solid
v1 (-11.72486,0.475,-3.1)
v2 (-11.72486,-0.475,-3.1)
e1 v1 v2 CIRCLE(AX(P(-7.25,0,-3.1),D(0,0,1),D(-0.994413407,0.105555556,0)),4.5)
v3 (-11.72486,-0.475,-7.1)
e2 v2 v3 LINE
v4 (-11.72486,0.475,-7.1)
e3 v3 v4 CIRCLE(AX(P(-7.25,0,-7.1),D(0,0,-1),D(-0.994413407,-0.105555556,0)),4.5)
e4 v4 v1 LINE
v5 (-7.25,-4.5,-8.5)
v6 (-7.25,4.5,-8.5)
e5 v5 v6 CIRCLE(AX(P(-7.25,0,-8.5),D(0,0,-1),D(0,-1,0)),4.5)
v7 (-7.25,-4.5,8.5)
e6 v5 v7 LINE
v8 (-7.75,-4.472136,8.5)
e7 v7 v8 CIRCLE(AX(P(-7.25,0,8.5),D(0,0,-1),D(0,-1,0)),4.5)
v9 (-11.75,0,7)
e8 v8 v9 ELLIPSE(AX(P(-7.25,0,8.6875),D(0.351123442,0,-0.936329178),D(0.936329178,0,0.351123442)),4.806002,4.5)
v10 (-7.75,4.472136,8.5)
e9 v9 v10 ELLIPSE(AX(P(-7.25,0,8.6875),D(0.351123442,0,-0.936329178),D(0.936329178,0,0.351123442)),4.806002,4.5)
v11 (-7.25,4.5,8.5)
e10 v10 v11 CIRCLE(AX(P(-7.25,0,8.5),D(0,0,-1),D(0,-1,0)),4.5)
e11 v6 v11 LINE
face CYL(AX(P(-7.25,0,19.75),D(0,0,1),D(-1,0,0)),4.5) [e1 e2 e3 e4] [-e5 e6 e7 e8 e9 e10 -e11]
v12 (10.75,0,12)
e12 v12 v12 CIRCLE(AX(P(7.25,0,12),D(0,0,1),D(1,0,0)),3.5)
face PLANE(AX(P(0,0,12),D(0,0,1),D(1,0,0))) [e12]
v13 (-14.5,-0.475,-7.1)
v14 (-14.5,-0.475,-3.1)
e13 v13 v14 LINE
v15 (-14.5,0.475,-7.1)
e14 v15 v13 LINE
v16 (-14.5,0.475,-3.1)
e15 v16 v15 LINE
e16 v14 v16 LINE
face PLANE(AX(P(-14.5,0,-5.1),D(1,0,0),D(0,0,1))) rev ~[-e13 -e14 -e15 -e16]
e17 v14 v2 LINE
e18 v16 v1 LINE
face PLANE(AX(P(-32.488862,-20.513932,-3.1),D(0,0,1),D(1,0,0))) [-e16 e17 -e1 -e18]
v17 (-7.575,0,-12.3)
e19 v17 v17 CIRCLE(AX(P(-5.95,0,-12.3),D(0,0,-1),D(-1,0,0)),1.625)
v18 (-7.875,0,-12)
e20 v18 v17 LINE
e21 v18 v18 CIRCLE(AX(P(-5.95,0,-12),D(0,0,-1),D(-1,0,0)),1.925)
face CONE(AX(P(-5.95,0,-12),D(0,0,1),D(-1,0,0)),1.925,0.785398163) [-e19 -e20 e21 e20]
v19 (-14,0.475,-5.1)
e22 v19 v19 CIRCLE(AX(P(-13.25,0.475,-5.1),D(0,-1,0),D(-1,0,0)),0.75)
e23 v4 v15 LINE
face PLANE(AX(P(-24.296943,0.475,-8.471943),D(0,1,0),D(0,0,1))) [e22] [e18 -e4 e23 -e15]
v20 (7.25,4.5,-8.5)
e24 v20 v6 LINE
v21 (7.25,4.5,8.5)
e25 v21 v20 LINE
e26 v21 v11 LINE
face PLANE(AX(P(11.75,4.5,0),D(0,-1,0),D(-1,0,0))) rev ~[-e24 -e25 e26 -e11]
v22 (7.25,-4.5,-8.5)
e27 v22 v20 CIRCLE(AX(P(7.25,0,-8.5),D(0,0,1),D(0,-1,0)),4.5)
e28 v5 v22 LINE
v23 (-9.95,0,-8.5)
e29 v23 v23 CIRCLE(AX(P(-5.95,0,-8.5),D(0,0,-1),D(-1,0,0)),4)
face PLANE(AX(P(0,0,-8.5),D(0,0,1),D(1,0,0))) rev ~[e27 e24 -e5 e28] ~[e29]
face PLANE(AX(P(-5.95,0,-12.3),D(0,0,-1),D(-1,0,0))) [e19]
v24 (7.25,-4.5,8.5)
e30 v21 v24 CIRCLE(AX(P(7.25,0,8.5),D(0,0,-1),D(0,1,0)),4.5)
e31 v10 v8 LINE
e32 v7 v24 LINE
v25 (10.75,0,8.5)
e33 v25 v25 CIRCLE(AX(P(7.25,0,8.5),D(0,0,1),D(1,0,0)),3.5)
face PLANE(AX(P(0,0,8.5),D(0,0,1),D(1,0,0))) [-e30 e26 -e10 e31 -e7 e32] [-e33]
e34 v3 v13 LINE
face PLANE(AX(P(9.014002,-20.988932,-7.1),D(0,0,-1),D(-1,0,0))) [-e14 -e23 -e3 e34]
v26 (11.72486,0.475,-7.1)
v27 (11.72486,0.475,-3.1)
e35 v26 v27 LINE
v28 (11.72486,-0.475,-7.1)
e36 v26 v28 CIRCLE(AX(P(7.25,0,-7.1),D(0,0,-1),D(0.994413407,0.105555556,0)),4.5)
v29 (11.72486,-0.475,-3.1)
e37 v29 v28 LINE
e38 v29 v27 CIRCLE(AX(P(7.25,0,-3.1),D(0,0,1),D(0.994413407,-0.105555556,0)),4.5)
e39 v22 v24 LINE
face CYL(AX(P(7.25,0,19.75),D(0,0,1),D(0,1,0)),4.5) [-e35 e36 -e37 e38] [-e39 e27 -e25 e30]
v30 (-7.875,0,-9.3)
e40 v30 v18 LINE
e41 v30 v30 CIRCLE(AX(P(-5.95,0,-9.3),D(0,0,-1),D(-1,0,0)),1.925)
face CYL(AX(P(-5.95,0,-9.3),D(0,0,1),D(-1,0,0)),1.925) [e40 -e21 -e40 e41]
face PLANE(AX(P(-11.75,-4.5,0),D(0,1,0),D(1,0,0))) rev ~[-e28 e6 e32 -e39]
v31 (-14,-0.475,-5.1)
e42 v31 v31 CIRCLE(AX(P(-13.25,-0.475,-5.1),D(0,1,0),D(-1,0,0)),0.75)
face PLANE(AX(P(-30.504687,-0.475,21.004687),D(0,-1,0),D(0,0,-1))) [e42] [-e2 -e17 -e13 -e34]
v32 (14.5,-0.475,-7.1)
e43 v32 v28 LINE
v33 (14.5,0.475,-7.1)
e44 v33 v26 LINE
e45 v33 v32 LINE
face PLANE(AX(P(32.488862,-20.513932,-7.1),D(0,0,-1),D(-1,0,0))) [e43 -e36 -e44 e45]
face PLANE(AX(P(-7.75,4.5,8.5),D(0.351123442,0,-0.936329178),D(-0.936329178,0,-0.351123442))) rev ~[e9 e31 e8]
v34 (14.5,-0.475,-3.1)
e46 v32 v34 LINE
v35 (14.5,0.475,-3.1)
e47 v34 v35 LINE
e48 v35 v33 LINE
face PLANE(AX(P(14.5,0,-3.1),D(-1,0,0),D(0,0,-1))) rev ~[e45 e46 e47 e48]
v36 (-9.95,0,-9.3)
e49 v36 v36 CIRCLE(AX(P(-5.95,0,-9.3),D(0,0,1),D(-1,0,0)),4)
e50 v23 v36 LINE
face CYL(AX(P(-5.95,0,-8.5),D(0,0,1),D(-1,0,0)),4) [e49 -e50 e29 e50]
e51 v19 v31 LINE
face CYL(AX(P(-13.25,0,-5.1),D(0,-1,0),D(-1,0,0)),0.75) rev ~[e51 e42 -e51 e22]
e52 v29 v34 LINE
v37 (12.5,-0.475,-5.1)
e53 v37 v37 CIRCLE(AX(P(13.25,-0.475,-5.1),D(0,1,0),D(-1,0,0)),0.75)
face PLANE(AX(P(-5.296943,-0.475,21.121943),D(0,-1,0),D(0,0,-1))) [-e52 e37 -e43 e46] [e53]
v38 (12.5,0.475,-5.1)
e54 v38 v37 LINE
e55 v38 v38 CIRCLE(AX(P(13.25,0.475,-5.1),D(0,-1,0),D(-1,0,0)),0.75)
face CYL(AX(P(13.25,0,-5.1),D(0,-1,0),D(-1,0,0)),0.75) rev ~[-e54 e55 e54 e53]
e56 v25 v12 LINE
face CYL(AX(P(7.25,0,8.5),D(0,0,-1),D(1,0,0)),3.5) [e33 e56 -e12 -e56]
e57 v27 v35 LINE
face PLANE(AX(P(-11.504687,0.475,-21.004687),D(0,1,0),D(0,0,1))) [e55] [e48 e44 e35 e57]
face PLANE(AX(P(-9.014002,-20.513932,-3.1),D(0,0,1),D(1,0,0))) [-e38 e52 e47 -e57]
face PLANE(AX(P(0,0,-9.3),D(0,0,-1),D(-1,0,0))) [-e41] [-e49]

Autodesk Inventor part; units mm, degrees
ref_plane "YZ Plane" through (0, 0, 0) normal (1, 0, 0) x (0, 1, 0)
ref_plane "XZ Plane" through (0, 0, 0) normal (0, 1, 0) x (-1, 0, 0)
ref_plane "XY Plane" through (0, 0, 0) normal (0, 0, 1) x (1, 0, 0)
sketch "Эскиз1" plane through (0, 0, 0) normal (0, 0, 1) x (1, 0, 0)
  line L0 (-11.75, -4.5) -> (11.75, -4.5)
  line L1 (11.75, -4.5) -> (11.75, 4.5)
  line L2 (11.75, 4.5) -> (-11.75, 4.5)
  line L3 (-11.75, 4.5) -> (-11.75, -4.5)
  line L4 (-11.75, -4.5) -> (11.75, 4.5) construction
  line L5 (11.75, -4.5) -> (-11.75, 4.5) construction
  point P0 (0, 0)
  dimension "d0" = 23.5
  dimension "d1" = 9
extrude "Выдавливание1" add sketch "Эскиз1" along normal mid plane 17
sketch "Эскиз2" plane through (0, 0, 0) normal (0, 1, 0) x (-1, 0, 0)
  line L0 (14.5, -3.1) -> (-14.5, -3.1)
  line L1 (-14.5, -3.1) -> (-14.5, -7.1)
  line L2 (-14.5, -7.1) -> (14.5, -7.1)
  line L3 (14.5, -7.1) -> (14.5, -3.1)
  line L4 (-11.75, 8.5) -> (11.75, 8.5) projected
  line L5 (0, 8.5) -> (0, -8.5)
  line L6 (11.75, -8.5) -> (-11.75, -8.5) projected
  line L7 (14.5, -5.1) -> (-14.5, -5.1)
  line L8 (13.25, -5.1) -> (-13.25, -5.1)
  circle A0 centre (13.25, -5.1) radius 0.75
  circle A1 centre (-13.25, -5.1) radius 0.75
  point P0 (0, 0)
  point P1 (0, -7.1)
  point P2 (0, -5.1)
  dimension "d4" = 29
  dimension "d5" = 4
  dimension "d6" = 26.5
  dimension "d7" = 1.5
  dimension "d8" = 1.5
  dimension "d9" = 3.4
extrude "Выдавливание2" add sketch "Эскиз2" along normal mid plane 0.95 contours L3 L7 A0 L5 L0 | L5 L7 A1 L1 L0 | L3 L2 L5 L7 A0 | L5 L2 L1 L7 A1
fillet "Сопряжение1" radius 4.5 4 edges at (-11.75, -4.5, 0) (-11.75, 4.5, 0) (11.75, 4.5, 0) (11.75, -4.5, 0)
sketch "Эскиз3" plane through (0, 0, 8.5) normal (0, 0, 1) x (1, 0, 0)
  arc A0 (7.25, -4.5) -> (7.25, 4.5) centre (7.25, 0) ccw projected
  circle A1 centre (7.25, 0) radius 3.5
  point P0 (0, 0)
  dimension "d13" = 7
extrude "Выдавливание3" add sketch "Эскиз3" along normal blind 3.5
sketch "Эскиз4" plane through (-7.25, 4.5, -8.5) normal (0, 1, 0) x (1, 0, 0)
  line L0 (0, -17) -> (-4.5, -17) projected
  line L1 (-4.5, -17) -> (-4.5, -15.5)
  line L2 (-4.5, 0) -> (-4.5, -17) projected
  line L3 (-4.5, -17) -> (-0.5, -17)
  line L4 (-0.5, -17) -> (-4.5, -15.5)
  point P0 (7.25, -8.5)
  dimension "d16" = 1.5
  dimension "d17" = 4
extrude "Выдавливание4" cut sketch "Эскиз4" against normal blind 20
sketch "Эскиз5" plane through (0, 0, -8.5) normal (0, 0, -1) x (-1, 0, 0)
  line L0 (14.5, -0.475) -> (14.5, 0.475) projected
  line L1 (14.5, 0) -> (-14.5, 0)
  line L2 (-14.5, -0.475) -> (-14.5, 0.475) projected
  circle A0 centre (5.95, 0) radius 4
  line L3 (12.5, 0.475) -> (12.5, -0.475) projected
  line L4 (12.5, 0) -> (14, 0)
  line L5 (14, 0.475) -> (14, -0.475) projected
  line L6 (13.25, 0) -> (5.95, 0)
  point P0 (0, 0)
  dimension "d20" = 8
  dimension "d21" = 7.3
extrude "Выдавливание5" add sketch "Эскиз5" along normal blind 0.8
sketch "Эскиз6" plane through (-5.95, 0, -9.3) normal (0, 0, -1) x (-1, 0, 0)
  circle A0 centre (0, 0) radius 1.925
  point P0 (-5.95, 0)
  dimension "d24" = 3.85
extrude "Выдавливание6" add sketch "Эскиз6" along normal blind 3
chamfer "Фаска1" distance 0.3 angle 45 1 edges at (-4.025, 0, -12.3)
sketch "Эскиз7" plane through (0, 0, -8.5) normal (0, 0, -1) x (-1, 0, 0)
  circle A0 centre (5.95, 0) radius 4 projected
  arc A1 (-7.25, 4.5) -> (-7.25, -4.5) centre (-7.25, 0) ccw projected
  line L0 (-7.25, -4.5) -> (7.25, -4.5) projected
  arc A2 (7.25, -4.5) -> (7.25, 4.5) centre (7.25, 0) ccw projected
  line L1 (7.25, 4.5) -> (-7.25, 4.5) projected
  line L2 (7.25, -4.5) -> (-7.25, -4.5)
  line L3 (-7.25, -4.5) -> (-7.25, 4.5)
  line L4 (-7.25, 4.5) -> (7.25, 4.5)
  line L5 (7.25, 4.5) -> (7.25, -4.5)
  circle A3 centre (5.95, 0) radius 1.925 projected
  circle A4 centre (5.95, 0) radius 4 projected
  circle A5 centre (5.95, 0) radius 1.625 projected
  point P0 (0, 0)
properties part number "OCS-D008 B"
